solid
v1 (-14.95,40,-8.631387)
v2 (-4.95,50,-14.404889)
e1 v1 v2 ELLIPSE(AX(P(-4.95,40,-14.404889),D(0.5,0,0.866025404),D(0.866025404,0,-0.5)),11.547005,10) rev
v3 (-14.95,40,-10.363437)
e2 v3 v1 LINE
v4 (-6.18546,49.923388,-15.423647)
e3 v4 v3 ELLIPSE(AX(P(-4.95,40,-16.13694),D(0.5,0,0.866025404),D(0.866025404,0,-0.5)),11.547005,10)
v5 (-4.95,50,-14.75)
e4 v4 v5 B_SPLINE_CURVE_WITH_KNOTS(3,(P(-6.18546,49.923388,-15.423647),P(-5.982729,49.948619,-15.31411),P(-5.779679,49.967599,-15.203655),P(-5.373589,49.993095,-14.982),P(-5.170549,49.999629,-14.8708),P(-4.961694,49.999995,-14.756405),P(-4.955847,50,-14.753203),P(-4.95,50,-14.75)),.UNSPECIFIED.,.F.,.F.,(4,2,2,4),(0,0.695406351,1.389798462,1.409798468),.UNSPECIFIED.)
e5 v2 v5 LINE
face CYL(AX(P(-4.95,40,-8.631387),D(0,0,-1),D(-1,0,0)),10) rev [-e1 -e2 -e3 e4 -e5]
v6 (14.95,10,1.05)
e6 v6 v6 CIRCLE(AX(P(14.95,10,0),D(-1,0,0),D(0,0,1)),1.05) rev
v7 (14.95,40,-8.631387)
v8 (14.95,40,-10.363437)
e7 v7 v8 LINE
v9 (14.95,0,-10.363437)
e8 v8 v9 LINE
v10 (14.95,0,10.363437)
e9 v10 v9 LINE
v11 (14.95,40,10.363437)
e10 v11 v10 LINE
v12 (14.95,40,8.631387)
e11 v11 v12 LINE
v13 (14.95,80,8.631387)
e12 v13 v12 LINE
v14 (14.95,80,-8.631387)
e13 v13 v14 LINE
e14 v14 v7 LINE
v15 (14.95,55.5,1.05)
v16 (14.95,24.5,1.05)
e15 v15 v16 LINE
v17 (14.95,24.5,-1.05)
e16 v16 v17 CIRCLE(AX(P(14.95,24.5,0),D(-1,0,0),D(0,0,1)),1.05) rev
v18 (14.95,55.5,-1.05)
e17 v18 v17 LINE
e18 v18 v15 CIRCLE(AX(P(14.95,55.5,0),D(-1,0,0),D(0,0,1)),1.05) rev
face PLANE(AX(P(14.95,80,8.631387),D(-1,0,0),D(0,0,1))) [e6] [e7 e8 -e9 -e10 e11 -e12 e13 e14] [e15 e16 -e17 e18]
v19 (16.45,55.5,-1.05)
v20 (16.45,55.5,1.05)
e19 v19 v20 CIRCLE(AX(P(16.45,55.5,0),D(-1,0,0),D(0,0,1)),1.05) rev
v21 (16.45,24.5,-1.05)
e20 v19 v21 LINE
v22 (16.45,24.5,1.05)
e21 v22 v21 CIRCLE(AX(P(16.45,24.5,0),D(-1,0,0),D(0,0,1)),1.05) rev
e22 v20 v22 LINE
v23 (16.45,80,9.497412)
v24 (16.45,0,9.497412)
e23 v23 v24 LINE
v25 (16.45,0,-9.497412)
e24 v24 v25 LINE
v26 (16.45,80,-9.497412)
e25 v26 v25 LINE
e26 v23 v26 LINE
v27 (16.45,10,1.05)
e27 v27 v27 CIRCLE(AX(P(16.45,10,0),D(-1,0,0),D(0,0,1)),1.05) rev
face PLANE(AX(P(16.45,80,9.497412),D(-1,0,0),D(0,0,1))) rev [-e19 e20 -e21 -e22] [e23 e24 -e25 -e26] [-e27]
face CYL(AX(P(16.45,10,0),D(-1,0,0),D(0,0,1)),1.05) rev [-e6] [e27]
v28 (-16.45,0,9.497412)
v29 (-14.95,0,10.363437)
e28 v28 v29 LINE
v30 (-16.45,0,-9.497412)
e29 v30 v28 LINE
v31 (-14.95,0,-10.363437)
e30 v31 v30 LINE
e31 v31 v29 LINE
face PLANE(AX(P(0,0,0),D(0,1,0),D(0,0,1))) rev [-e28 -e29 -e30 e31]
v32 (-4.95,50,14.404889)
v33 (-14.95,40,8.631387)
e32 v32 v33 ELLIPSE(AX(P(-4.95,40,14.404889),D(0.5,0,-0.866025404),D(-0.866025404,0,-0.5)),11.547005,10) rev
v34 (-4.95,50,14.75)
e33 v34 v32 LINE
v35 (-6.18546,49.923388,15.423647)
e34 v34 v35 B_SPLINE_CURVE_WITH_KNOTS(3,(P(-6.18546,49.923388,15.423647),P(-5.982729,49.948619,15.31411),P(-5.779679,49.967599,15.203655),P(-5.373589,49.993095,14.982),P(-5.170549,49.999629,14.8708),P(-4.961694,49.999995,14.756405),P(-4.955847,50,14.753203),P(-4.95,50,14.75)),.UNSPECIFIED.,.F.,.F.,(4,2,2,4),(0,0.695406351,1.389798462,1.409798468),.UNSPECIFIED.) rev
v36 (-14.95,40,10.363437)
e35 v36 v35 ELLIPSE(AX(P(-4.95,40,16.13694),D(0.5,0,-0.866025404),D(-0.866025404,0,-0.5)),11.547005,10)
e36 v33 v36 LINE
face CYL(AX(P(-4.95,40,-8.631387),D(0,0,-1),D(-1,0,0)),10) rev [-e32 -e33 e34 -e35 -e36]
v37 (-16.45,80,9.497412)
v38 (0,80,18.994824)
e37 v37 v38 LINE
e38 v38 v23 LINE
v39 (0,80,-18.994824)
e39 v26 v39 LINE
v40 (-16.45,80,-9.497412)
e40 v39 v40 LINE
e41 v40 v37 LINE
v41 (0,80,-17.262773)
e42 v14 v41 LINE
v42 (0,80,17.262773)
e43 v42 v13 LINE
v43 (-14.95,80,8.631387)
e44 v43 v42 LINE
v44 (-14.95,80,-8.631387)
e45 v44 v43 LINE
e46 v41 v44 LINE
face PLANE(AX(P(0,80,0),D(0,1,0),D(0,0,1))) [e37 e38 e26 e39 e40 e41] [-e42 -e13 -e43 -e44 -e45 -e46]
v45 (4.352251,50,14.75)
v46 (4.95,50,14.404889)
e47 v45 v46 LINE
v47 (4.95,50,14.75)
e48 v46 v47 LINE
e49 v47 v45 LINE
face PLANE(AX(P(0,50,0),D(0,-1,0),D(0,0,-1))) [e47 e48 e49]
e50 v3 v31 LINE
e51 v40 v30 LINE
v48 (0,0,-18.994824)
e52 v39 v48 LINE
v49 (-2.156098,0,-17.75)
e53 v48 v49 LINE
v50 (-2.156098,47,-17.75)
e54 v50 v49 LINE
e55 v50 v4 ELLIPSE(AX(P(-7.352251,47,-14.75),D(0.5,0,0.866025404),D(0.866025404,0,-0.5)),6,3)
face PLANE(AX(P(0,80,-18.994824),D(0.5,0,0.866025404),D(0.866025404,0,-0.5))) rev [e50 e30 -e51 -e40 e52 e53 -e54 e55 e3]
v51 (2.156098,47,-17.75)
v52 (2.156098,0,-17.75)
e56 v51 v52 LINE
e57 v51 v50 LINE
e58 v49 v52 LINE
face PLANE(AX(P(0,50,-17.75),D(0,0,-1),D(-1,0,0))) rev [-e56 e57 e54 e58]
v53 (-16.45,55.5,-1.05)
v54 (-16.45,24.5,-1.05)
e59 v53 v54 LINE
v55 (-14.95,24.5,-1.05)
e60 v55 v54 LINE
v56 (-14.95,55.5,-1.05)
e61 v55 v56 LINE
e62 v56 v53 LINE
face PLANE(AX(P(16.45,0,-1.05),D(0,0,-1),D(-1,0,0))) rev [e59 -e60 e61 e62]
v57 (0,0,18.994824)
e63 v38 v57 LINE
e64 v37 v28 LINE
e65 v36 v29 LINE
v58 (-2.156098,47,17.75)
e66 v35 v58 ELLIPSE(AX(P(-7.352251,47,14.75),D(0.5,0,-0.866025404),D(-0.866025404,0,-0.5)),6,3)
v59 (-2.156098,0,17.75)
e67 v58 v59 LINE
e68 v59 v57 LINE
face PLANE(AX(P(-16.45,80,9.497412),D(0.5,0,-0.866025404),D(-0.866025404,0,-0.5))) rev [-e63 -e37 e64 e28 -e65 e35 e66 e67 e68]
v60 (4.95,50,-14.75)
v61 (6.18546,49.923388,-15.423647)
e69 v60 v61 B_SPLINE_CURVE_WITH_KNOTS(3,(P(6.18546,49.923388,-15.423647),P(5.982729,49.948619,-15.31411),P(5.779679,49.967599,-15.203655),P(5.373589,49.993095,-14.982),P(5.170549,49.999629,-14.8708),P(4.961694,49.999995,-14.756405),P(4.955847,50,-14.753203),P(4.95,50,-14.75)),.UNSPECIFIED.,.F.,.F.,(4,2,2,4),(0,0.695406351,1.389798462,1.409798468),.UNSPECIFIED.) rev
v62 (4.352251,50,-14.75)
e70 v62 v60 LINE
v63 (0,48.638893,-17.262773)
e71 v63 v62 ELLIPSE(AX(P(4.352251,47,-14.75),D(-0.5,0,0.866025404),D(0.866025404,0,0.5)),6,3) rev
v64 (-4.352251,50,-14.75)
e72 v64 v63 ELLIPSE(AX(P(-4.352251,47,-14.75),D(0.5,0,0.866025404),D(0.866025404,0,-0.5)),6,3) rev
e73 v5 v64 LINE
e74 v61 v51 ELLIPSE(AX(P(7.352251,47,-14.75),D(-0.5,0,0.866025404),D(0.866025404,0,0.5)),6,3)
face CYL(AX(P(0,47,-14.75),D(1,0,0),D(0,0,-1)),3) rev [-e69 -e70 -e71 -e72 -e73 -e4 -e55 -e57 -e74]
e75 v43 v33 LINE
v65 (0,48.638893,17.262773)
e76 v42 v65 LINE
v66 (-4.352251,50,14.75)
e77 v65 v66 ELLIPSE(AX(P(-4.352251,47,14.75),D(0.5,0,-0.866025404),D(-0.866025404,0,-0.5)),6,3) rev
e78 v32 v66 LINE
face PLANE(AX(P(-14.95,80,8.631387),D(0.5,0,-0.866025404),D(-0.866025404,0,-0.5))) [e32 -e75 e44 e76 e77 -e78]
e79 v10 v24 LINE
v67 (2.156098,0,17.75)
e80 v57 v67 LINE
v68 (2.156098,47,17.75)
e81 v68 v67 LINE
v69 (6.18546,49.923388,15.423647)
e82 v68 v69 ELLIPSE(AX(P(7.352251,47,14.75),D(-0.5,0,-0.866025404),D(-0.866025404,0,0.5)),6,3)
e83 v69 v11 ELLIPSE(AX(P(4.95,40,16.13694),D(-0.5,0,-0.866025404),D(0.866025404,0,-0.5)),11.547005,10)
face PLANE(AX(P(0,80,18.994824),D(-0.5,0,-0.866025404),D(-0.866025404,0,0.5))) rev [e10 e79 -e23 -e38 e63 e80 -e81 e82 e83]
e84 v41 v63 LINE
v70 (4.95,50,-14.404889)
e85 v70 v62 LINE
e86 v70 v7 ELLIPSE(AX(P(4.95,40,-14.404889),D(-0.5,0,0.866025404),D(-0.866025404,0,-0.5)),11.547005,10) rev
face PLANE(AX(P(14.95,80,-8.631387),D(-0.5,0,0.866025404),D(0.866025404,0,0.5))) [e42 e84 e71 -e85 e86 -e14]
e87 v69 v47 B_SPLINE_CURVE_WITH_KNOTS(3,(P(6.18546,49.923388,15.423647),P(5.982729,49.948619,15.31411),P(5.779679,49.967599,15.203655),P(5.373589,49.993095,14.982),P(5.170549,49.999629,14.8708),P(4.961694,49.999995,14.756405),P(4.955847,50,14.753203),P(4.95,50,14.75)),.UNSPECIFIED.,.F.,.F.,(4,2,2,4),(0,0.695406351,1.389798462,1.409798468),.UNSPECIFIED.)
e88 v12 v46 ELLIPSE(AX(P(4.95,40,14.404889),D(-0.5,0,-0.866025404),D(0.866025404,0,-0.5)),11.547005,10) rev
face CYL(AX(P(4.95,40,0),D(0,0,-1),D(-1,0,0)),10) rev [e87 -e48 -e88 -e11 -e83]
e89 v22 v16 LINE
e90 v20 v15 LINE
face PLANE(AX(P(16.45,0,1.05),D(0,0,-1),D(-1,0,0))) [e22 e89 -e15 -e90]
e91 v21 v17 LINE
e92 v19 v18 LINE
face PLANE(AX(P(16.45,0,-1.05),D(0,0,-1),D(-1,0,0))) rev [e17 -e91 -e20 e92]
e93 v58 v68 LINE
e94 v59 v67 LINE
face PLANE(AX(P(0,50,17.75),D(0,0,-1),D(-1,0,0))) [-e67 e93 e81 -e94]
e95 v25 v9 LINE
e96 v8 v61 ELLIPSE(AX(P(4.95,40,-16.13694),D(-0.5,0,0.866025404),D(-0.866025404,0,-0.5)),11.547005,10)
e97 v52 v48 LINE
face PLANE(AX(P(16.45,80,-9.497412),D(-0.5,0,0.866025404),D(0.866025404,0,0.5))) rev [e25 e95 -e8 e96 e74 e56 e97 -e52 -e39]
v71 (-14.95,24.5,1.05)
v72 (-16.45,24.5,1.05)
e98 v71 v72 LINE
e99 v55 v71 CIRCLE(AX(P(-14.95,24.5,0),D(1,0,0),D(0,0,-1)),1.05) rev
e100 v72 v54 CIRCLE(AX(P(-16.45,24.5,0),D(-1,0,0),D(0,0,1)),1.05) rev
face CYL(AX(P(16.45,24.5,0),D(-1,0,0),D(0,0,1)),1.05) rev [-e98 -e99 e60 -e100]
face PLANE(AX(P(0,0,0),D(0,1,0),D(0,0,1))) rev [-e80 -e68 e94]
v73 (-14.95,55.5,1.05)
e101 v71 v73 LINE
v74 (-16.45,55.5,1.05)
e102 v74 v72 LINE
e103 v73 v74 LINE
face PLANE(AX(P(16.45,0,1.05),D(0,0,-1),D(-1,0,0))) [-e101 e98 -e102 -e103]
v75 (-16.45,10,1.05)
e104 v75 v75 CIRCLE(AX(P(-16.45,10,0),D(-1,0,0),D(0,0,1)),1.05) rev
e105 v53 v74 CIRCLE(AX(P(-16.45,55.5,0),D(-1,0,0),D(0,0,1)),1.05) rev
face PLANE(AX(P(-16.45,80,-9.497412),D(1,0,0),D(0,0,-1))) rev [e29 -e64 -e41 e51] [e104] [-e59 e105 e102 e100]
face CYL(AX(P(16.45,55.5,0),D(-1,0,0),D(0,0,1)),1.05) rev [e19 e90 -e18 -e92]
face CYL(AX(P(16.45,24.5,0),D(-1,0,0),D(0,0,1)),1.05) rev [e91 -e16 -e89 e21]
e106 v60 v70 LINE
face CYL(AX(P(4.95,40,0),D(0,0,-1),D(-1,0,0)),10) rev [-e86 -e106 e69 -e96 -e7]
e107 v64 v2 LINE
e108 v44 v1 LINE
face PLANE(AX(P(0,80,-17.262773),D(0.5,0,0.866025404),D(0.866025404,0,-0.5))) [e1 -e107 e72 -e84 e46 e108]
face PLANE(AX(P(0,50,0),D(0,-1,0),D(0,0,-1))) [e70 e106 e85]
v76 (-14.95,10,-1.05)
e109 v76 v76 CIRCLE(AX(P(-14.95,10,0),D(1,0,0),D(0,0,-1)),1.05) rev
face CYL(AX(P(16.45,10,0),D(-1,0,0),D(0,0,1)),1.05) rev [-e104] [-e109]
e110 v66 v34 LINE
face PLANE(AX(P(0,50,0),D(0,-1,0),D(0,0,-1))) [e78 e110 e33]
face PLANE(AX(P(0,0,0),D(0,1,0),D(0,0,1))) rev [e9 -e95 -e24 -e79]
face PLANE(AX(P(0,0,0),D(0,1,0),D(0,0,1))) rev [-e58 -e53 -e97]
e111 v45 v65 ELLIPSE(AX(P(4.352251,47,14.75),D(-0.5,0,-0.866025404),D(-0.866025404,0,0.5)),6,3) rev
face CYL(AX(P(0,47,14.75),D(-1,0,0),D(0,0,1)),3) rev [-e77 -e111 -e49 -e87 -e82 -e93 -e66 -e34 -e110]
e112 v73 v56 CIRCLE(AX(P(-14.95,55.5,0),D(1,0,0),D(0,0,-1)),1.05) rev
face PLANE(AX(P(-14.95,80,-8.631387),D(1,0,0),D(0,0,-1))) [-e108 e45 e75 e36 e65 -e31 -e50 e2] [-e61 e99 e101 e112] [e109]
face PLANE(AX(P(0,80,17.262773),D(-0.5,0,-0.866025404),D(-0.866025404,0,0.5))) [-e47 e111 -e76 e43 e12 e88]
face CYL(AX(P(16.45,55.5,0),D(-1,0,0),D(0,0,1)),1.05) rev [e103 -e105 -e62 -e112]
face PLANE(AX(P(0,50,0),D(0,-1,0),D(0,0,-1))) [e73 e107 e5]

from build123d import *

# Parameters (mm, degrees)
BOSS_EXTRUDE1_DEPTH     = 80
CUT_EXTRUDE1_DEPTH      = 89.561918076
CUT_EXTRUDE1_DEPTH_BACK = 89.561918076
SKETCH3_R               = 1.05
CUT_EXTRUDE2_DEPTH      = 89.561918076
CUT_EXTRUDE3_DEPTH      = 50
FILLET2_R               = 10
FILLET3_R               = 3


with BuildPart() as part:
    # Sketch1 → Boss-Extrude1 (new body)
    with BuildSketch(Plane(origin=(0, 0, 0), x_dir=(1, 0, 0), z_dir=(0, 1, 0))):
        Polygon((16.45, -9.497411928), (16.45, 9.497411928), (0, 18.994823856), (-16.45, 9.497411928), (-16.45, -9.497411928), (0, -18.994823856), align=None)
        Polygon((14.95, 8.631386524), (0, 17.262773049), (-14.95, 8.631386524), (-14.95, -8.631386524), (0, -17.262773049), (14.95, -8.631386524), align=None, mode=Mode.SUBTRACT)
    extrude(amount=BOSS_EXTRUDE1_DEPTH)

    # Sketch2 → Cut-Extrude1 (cut, two sides: drawn at the far end of the back side and taken through both)
    with BuildSketch(Plane(origin=(-16.45, 0, 0), x_dir=(0, 0, -1), z_dir=(1, 0, 0)).offset(-CUT_EXTRUDE1_DEPTH_BACK)):
        with BuildLine():
            Line((1.05, 55.5), (1.05, 24.5))
            ThreePointArc((1.05, 24.5), (0, 23.45), (-1.05, 24.5))
            Line((-1.05, 24.5), (-1.05, 55.5))
            ThreePointArc((-1.05, 55.5), (0, 56.55), (1.05, 55.5))
        make_face()
    extrude(amount=CUT_EXTRUDE1_DEPTH + CUT_EXTRUDE1_DEPTH_BACK, mode=Mode.SUBTRACT)

    # Sketch3 → Cut-Extrude2 (cut, through all)
    with BuildSketch(Plane(origin=(-16.45, 0, 0), x_dir=(0, 0, -1), z_dir=(1, 0, 0))):
        with Locations(Location((0, 10, 0), (0, 0, 180))):
            Circle(SKETCH3_R)
    extrude(amount=CUT_EXTRUDE2_DEPTH, mode=Mode.SUBTRACT)

    # Sketch5 → Cut-Extrude3 (cut)
    with BuildSketch(Plane.XZ):
        Polygon((-14.95, 10.363437332), (-14.95, 8.631386524), (0, 17.262773049), (14.95, 8.631386524), (14.95, 10.363437332), (2.156098166, 17.75), (-2.156098166, 17.75), align=None)
        Polygon((-14.95, -10.363437332), (-2.156098166, -17.75), (2.156098166, -17.75), (14.95, -10.363437332), (14.95, -8.631386524), (0, -17.262773049), (-14.95, -8.631386524), align=None)
    extrude(amount=-CUT_EXTRUDE3_DEPTH, mode=Mode.SUBTRACT)

    # Fillet2
    # the kernel refuses this fillet: 10 mm, written as the material it adds along each edge
    with BuildSketch(Plane(origin=(14.95, 50, -16.368613476), x_dir=(0, -1, 0), z_dir=(0, 0, 1))) as fillet2_piece_1_section:
        with BuildLine():
            CenterArc((FILLET2_R, -FILLET2_R), FILLET2_R, 90, 90)
            Line((0, -FILLET2_R), (0, 0))
            Line((0, 0), (FILLET2_R, 0))
        make_face()
    fillet2_piece_1 = extrude(amount=51.732050808, mode=Mode.PRIVATE)
    fillet2_piece_1 = split(fillet2_piece_1, bisect_by=Plane(origin=(12.341320611, 47.766320611, -10.137508272), z_dir=(0.5000000000000004, 0, -0.8660254037844385)), keep=Keep.TOP, mode=Mode.PRIVATE)
    fillet2_piece_1 = split(fillet2_piece_1, bisect_by=Plane(origin=(13.091320611, 47.766320611, -11.436546378), z_dir=(-0.5000000000000003, 0, 0.8660254037844385)), keep=Keep.TOP, mode=Mode.PRIVATE)
    add(fillet2_piece_1)
    with BuildSketch(Plane(origin=(14.95, 50, -16.368613476), x_dir=(0, -1, 0), z_dir=(0, 0, 1))) as fillet2_piece_2_section:
        with BuildLine():
            CenterArc((FILLET2_R, -FILLET2_R), FILLET2_R, 90, 90)
            Line((0, -FILLET2_R), (0, 0))
            Line((0, 0), (FILLET2_R, 0))
        make_face()
    fillet2_piece_2 = extrude(amount=51.732050808, mode=Mode.PRIVATE)
    fillet2_piece_2 = split(fillet2_piece_2, bisect_by=Plane(origin=(12.341320611, 47.766320611, 10.137508272), z_dir=(0.49999999999999967, 0, 0.8660254037844388)), keep=Keep.TOP, mode=Mode.PRIVATE)
    fillet2_piece_2 = split(fillet2_piece_2, bisect_by=Plane(origin=(13.091320611, 47.766320611, 11.436546378), z_dir=(-0.4999999999999997, 0, -0.8660254037844388)), keep=Keep.TOP, mode=Mode.PRIVATE)
    add(fillet2_piece_2)
    with BuildSketch(Plane(origin=(-14.95, 50, 35.363437332), x_dir=(1, 0, 0), z_dir=(0, 0, -1))) as fillet2_piece_3_section:
        with BuildLine():
            CenterArc((FILLET2_R, FILLET2_R), FILLET2_R, 180, 90)
            Line((0, FILLET2_R), (0, 0))
            Line((0, 0), (FILLET2_R, 0))
        make_face()
    fillet2_piece_3 = extrude(amount=51.732050808, mode=Mode.PRIVATE)
    fillet2_piece_3 = split(fillet2_piece_3, bisect_by=Plane(origin=(-13.091320611, 47.766320611, 11.436546378), z_dir=(0.5000000000000001, 0, -0.8660254037844387)), keep=Keep.TOP, mode=Mode.PRIVATE)
    fillet2_piece_3 = split(fillet2_piece_3, bisect_by=Plane(origin=(-12.341320611, 47.766320611, 10.137508272), z_dir=(-0.5000000000000002, 0, 0.8660254037844386)), keep=Keep.TOP, mode=Mode.PRIVATE)
    add(fillet2_piece_3)
    with BuildSketch(Plane(origin=(-14.95, 50, 35.363437332), x_dir=(1, 0, 0), z_dir=(0, 0, -1))) as fillet2_piece_4_section:
        with BuildLine():
            CenterArc((FILLET2_R, FILLET2_R), FILLET2_R, 180, 90)
            Line((0, FILLET2_R), (0, 0))
            Line((0, 0), (FILLET2_R, 0))
        make_face()
    fillet2_piece_4 = extrude(amount=51.732050808, mode=Mode.PRIVATE)
    fillet2_piece_4 = split(fillet2_piece_4, bisect_by=Plane(origin=(-13.091320611, 47.766320611, -11.436546378), z_dir=(0.49999999999999956, 0, 0.8660254037844389)), keep=Keep.TOP, mode=Mode.PRIVATE)
    fillet2_piece_4 = split(fillet2_piece_4, bisect_by=Plane(origin=(-12.341320611, 47.766320611, -10.137508272), z_dir=(-0.49999999999999956, 0, -0.8660254037844389)), keep=Keep.TOP, mode=Mode.PRIVATE)
    add(fillet2_piece_4)
    with BuildSketch(Plane(origin=(14.95, 50, -35.363437332), x_dir=(0, -1, 0), z_dir=(0, 0, 1))) as fillet2_piece_5_section:
        with BuildLine():
            CenterArc((FILLET2_R, -FILLET2_R), FILLET2_R, 90, 90)
            Line((0, -FILLET2_R), (0, 0))
            Line((0, 0), (FILLET2_R, 0))
        make_face()
    fillet2_piece_5 = extrude(amount=51.732050808, mode=Mode.PRIVATE)
    fillet2_piece_5 = split(fillet2_piece_5, bisect_by=Plane(origin=(12.341320611, 47.766320611, -10.137508272), z_dir=(0.5000000000000004, 0, -0.8660254037844385)), keep=Keep.TOP, mode=Mode.PRIVATE)
    fillet2_piece_5 = split(fillet2_piece_5, bisect_by=Plane(origin=(13.091320611, 47.766320611, -11.436546378), z_dir=(-0.5000000000000003, 0, 0.8660254037844385)), keep=Keep.TOP, mode=Mode.PRIVATE)
    add(fillet2_piece_5)
    with BuildSketch(Plane(origin=(14.95, 50, -35.363437332), x_dir=(0, -1, 0), z_dir=(0, 0, 1))) as fillet2_piece_6_section:
        with BuildLine():
            CenterArc((FILLET2_R, -FILLET2_R), FILLET2_R, 90, 90)
            Line((0, -FILLET2_R), (0, 0))
            Line((0, 0), (FILLET2_R, 0))
        make_face()
    fillet2_piece_6 = extrude(amount=51.732050808, mode=Mode.PRIVATE)
    fillet2_piece_6 = split(fillet2_piece_6, bisect_by=Plane(origin=(12.341320611, 47.766320611, 10.137508272), z_dir=(0.49999999999999967, 0, 0.8660254037844388)), keep=Keep.TOP, mode=Mode.PRIVATE)
    fillet2_piece_6 = split(fillet2_piece_6, bisect_by=Plane(origin=(13.091320611, 47.766320611, 11.436546378), z_dir=(-0.4999999999999997, 0, -0.8660254037844388)), keep=Keep.TOP, mode=Mode.PRIVATE)
    add(fillet2_piece_6)
    with BuildSketch(Plane(origin=(-14.95, 50, 16.368613476), x_dir=(0, -1, 0), z_dir=(0, 0, -1))) as fillet2_piece_7_section:
        with BuildLine():
            CenterArc((FILLET2_R, -FILLET2_R), FILLET2_R, 90, 90)
            Line((0, -FILLET2_R), (0, 0))
            Line((0, 0), (FILLET2_R, 0))
        make_face()
    fillet2_piece_7 = extrude(amount=51.732050808, mode=Mode.PRIVATE)
    fillet2_piece_7 = split(fillet2_piece_7, bisect_by=Plane(origin=(-13.091320611, 47.766320611, 11.436546378), z_dir=(0.5000000000000001, 0, -0.8660254037844387)), keep=Keep.TOP, mode=Mode.PRIVATE)
    fillet2_piece_7 = split(fillet2_piece_7, bisect_by=Plane(origin=(-12.341320611, 47.766320611, 10.137508272), z_dir=(-0.5000000000000002, 0, 0.8660254037844386)), keep=Keep.TOP, mode=Mode.PRIVATE)
    add(fillet2_piece_7)
    with BuildSketch(Plane(origin=(-14.95, 50, 16.368613476), x_dir=(0, -1, 0), z_dir=(0, 0, -1))) as fillet2_piece_8_section:
        with BuildLine():
            CenterArc((FILLET2_R, -FILLET2_R), FILLET2_R, 90, 90)
            Line((0, -FILLET2_R), (0, 0))
            Line((0, 0), (FILLET2_R, 0))
        make_face()
    fillet2_piece_8 = extrude(amount=51.732050808, mode=Mode.PRIVATE)
    fillet2_piece_8 = split(fillet2_piece_8, bisect_by=Plane(origin=(-13.091320611, 47.766320611, -11.436546378), z_dir=(0.49999999999999956, 0, 0.8660254037844389)), keep=Keep.TOP, mode=Mode.PRIVATE)
    fillet2_piece_8 = split(fillet2_piece_8, bisect_by=Plane(origin=(-12.341320611, 47.766320611, -10.137508272), z_dir=(-0.49999999999999956, 0, -0.8660254037844389)), keep=Keep.TOP, mode=Mode.PRIVATE)
    add(fillet2_piece_8)

    # Fillet3
    # the kernel refuses this fillet: 3 mm, written as the material it adds along each edge
    with BuildSketch(Plane(origin=(-9.656098166, 50, -17.75), x_dir=(0, -1, 0), z_dir=(1, 0, 0))) as fillet3_piece_1_section:
        with BuildLine():
            CenterArc((FILLET3_R, -FILLET3_R), FILLET3_R, 90, 90)
            Line((0, -FILLET3_R), (0, 0))
            Line((0, 0), (FILLET3_R, 0))
        make_face()
    fillet3_piece_1 = extrude(amount=19.312196331, mode=Mode.PRIVATE)
    fillet3_piece_1 = split(fillet3_piece_1, bisect_by=Plane(origin=(-1.532605741, 49.425378902, -18.147623386), z_dir=(-0.50000000000019, 0, 0.866025403784329)), keep=Keep.TOP, mode=Mode.PRIVATE)
    fillet3_piece_1 = split(fillet3_piece_1, bisect_by=Plane(origin=(-2.557365025, 49.425378902, -17.51832847), z_dir=(0.50000000000019, 0, 0.866025403784329)), keep=Keep.TOP, mode=Mode.PRIVATE)
    fillet3_piece_1 = split(fillet3_piece_1, bisect_by=Plane(origin=(-1.807365025, 49.425378902, -16.219290365), z_dir=(-0.50000000000019, 0, -0.866025403784329)), keep=Keep.TOP, mode=Mode.PRIVATE)
    add(fillet3_piece_1)
    with BuildSketch(Plane(origin=(-9.656098166, 50, -17.75), x_dir=(0, -1, 0), z_dir=(1, 0, 0))) as fillet3_piece_2_section:
        with BuildLine():
            CenterArc((FILLET3_R, -FILLET3_R), FILLET3_R, 90, 90)
            Line((0, -FILLET3_R), (0, 0))
            Line((0, 0), (FILLET3_R, 0))
        make_face()
    fillet3_piece_2 = extrude(amount=19.312196331, mode=Mode.PRIVATE)
    fillet3_piece_2 = split(fillet3_piece_2, bisect_by=Plane(origin=(-0.169131564, 48.834693799, -17.360421203), z_dir=(0.50000000000019, 0, -0.866025403784329)), keep=Keep.TOP, mode=Mode.PRIVATE)
    fillet3_piece_2 = split(fillet3_piece_2, bisect_by=Plane(origin=(0.169131564, 48.834693799, -17.360421203), z_dir=(-0.50000000000019, 0, -0.866025403784329)), keep=Keep.TOP, mode=Mode.PRIVATE)
    add(fillet3_piece_2)
    with BuildSketch(Plane(origin=(-9.656098166, 50, -17.75), x_dir=(0, -1, 0), z_dir=(1, 0, 0))) as fillet3_piece_3_section:
        with BuildLine():
            CenterArc((FILLET3_R, -FILLET3_R), FILLET3_R, 90, 90)
            Line((0, -FILLET3_R), (0, 0))
            Line((0, 0), (FILLET3_R, 0))
        make_face()
    fillet3_piece_3 = extrude(amount=19.312196331, mode=Mode.PRIVATE)
    fillet3_piece_3 = split(fillet3_piece_3, bisect_by=Plane(origin=(1.807365025, 49.425378902, -16.219290365), z_dir=(0.50000000000019, 0, -0.866025403784329)), keep=Keep.TOP, mode=Mode.PRIVATE)
    fillet3_piece_3 = split(fillet3_piece_3, bisect_by=Plane(origin=(2.557365025, 49.425378902, -17.51832847), z_dir=(-0.50000000000019, 0, 0.866025403784329)), keep=Keep.TOP, mode=Mode.PRIVATE)
    fillet3_piece_3 = split(fillet3_piece_3, bisect_by=Plane(origin=(1.532605741, 49.425378902, -18.147623386), z_dir=(0.50000000000019, 0, 0.866025403784329)), keep=Keep.TOP, mode=Mode.PRIVATE)
    add(fillet3_piece_3)
    with BuildSketch(Plane(origin=(9.656098166, 50, 17.75), x_dir=(0, 0, -1), z_dir=(-1, 0, 0))) as fillet3_piece_4_section:
        with BuildLine():
            CenterArc((FILLET3_R, FILLET3_R), FILLET3_R, 180, 90)
            Line((0, FILLET3_R), (0, 0))
            Line((0, 0), (FILLET3_R, 0))
        make_face()
    fillet3_piece_4 = extrude(amount=19.312196331, mode=Mode.PRIVATE)
    fillet3_piece_4 = split(fillet3_piece_4, bisect_by=Plane(origin=(2.557365029, 49.425378904, 17.518328468), z_dir=(-0.50000000000019, 0, -0.866025403784329)), keep=Keep.TOP, mode=Mode.PRIVATE)
    fillet3_piece_4 = split(fillet3_piece_4, bisect_by=Plane(origin=(1.807365029, 49.425378904, 16.219290363), z_dir=(0.50000000000019, 0, 0.866025403784329)), keep=Keep.TOP, mode=Mode.PRIVATE)
    fillet3_piece_4 = split(fillet3_piece_4, bisect_by=Plane(origin=(1.532605746, 49.425378904, 18.147623389), z_dir=(0.50000000000019, 0, -0.866025403784329)), keep=Keep.TOP, mode=Mode.PRIVATE)
    add(fillet3_piece_4)
    with BuildSketch(Plane(origin=(9.656098166, 50, 17.75), x_dir=(0, 0, -1), z_dir=(-1, 0, 0))) as fillet3_piece_5_section:
        with BuildLine():
            CenterArc((FILLET3_R, FILLET3_R), FILLET3_R, 180, 90)
            Line((0, FILLET3_R), (0, 0))
            Line((0, 0), (FILLET3_R, 0))
        make_face()
    fillet3_piece_5 = extrude(amount=19.312196331, mode=Mode.PRIVATE)
    fillet3_piece_5 = split(fillet3_piece_5, bisect_by=Plane(origin=(-0.169131564, 48.8346938, 17.360421203), z_dir=(0.50000000000019, 0, 0.866025403784329)), keep=Keep.TOP, mode=Mode.PRIVATE)
    fillet3_piece_5 = split(fillet3_piece_5, bisect_by=Plane(origin=(0.169131564, 48.8346938, 17.360421203), z_dir=(-0.50000000000019, 0, 0.866025403784329)), keep=Keep.TOP, mode=Mode.PRIVATE)
    add(fillet3_piece_5)
    with BuildSketch(Plane(origin=(9.656098166, 50, 17.75), x_dir=(0, 0, -1), z_dir=(-1, 0, 0))) as fillet3_piece_6_section:
        with BuildLine():
            CenterArc((FILLET3_R, FILLET3_R), FILLET3_R, 180, 90)
            Line((0, FILLET3_R), (0, 0))
            Line((0, 0), (FILLET3_R, 0))
        make_face()
    fillet3_piece_6 = extrude(amount=19.312196331, mode=Mode.PRIVATE)
    fillet3_piece_6 = split(fillet3_piece_6, bisect_by=Plane(origin=(-2.557365029, 49.425378904, 17.518328468), z_dir=(0.50000000000019, 0, -0.866025403784329)), keep=Keep.TOP, mode=Mode.PRIVATE)
    fillet3_piece_6 = split(fillet3_piece_6, bisect_by=Plane(origin=(-1.532605746, 49.425378904, 18.147623389), z_dir=(-0.50000000000019, 0, -0.866025403784329)), keep=Keep.TOP, mode=Mode.PRIVATE)
    fillet3_piece_6 = split(fillet3_piece_6, bisect_by=Plane(origin=(-1.807365029, 49.425378904, 16.219290363), z_dir=(-0.50000000000019, 0, 0.866025403784329)), keep=Keep.TOP, mode=Mode.PRIVATE)
    add(fillet3_piece_6)


solid = part.part
